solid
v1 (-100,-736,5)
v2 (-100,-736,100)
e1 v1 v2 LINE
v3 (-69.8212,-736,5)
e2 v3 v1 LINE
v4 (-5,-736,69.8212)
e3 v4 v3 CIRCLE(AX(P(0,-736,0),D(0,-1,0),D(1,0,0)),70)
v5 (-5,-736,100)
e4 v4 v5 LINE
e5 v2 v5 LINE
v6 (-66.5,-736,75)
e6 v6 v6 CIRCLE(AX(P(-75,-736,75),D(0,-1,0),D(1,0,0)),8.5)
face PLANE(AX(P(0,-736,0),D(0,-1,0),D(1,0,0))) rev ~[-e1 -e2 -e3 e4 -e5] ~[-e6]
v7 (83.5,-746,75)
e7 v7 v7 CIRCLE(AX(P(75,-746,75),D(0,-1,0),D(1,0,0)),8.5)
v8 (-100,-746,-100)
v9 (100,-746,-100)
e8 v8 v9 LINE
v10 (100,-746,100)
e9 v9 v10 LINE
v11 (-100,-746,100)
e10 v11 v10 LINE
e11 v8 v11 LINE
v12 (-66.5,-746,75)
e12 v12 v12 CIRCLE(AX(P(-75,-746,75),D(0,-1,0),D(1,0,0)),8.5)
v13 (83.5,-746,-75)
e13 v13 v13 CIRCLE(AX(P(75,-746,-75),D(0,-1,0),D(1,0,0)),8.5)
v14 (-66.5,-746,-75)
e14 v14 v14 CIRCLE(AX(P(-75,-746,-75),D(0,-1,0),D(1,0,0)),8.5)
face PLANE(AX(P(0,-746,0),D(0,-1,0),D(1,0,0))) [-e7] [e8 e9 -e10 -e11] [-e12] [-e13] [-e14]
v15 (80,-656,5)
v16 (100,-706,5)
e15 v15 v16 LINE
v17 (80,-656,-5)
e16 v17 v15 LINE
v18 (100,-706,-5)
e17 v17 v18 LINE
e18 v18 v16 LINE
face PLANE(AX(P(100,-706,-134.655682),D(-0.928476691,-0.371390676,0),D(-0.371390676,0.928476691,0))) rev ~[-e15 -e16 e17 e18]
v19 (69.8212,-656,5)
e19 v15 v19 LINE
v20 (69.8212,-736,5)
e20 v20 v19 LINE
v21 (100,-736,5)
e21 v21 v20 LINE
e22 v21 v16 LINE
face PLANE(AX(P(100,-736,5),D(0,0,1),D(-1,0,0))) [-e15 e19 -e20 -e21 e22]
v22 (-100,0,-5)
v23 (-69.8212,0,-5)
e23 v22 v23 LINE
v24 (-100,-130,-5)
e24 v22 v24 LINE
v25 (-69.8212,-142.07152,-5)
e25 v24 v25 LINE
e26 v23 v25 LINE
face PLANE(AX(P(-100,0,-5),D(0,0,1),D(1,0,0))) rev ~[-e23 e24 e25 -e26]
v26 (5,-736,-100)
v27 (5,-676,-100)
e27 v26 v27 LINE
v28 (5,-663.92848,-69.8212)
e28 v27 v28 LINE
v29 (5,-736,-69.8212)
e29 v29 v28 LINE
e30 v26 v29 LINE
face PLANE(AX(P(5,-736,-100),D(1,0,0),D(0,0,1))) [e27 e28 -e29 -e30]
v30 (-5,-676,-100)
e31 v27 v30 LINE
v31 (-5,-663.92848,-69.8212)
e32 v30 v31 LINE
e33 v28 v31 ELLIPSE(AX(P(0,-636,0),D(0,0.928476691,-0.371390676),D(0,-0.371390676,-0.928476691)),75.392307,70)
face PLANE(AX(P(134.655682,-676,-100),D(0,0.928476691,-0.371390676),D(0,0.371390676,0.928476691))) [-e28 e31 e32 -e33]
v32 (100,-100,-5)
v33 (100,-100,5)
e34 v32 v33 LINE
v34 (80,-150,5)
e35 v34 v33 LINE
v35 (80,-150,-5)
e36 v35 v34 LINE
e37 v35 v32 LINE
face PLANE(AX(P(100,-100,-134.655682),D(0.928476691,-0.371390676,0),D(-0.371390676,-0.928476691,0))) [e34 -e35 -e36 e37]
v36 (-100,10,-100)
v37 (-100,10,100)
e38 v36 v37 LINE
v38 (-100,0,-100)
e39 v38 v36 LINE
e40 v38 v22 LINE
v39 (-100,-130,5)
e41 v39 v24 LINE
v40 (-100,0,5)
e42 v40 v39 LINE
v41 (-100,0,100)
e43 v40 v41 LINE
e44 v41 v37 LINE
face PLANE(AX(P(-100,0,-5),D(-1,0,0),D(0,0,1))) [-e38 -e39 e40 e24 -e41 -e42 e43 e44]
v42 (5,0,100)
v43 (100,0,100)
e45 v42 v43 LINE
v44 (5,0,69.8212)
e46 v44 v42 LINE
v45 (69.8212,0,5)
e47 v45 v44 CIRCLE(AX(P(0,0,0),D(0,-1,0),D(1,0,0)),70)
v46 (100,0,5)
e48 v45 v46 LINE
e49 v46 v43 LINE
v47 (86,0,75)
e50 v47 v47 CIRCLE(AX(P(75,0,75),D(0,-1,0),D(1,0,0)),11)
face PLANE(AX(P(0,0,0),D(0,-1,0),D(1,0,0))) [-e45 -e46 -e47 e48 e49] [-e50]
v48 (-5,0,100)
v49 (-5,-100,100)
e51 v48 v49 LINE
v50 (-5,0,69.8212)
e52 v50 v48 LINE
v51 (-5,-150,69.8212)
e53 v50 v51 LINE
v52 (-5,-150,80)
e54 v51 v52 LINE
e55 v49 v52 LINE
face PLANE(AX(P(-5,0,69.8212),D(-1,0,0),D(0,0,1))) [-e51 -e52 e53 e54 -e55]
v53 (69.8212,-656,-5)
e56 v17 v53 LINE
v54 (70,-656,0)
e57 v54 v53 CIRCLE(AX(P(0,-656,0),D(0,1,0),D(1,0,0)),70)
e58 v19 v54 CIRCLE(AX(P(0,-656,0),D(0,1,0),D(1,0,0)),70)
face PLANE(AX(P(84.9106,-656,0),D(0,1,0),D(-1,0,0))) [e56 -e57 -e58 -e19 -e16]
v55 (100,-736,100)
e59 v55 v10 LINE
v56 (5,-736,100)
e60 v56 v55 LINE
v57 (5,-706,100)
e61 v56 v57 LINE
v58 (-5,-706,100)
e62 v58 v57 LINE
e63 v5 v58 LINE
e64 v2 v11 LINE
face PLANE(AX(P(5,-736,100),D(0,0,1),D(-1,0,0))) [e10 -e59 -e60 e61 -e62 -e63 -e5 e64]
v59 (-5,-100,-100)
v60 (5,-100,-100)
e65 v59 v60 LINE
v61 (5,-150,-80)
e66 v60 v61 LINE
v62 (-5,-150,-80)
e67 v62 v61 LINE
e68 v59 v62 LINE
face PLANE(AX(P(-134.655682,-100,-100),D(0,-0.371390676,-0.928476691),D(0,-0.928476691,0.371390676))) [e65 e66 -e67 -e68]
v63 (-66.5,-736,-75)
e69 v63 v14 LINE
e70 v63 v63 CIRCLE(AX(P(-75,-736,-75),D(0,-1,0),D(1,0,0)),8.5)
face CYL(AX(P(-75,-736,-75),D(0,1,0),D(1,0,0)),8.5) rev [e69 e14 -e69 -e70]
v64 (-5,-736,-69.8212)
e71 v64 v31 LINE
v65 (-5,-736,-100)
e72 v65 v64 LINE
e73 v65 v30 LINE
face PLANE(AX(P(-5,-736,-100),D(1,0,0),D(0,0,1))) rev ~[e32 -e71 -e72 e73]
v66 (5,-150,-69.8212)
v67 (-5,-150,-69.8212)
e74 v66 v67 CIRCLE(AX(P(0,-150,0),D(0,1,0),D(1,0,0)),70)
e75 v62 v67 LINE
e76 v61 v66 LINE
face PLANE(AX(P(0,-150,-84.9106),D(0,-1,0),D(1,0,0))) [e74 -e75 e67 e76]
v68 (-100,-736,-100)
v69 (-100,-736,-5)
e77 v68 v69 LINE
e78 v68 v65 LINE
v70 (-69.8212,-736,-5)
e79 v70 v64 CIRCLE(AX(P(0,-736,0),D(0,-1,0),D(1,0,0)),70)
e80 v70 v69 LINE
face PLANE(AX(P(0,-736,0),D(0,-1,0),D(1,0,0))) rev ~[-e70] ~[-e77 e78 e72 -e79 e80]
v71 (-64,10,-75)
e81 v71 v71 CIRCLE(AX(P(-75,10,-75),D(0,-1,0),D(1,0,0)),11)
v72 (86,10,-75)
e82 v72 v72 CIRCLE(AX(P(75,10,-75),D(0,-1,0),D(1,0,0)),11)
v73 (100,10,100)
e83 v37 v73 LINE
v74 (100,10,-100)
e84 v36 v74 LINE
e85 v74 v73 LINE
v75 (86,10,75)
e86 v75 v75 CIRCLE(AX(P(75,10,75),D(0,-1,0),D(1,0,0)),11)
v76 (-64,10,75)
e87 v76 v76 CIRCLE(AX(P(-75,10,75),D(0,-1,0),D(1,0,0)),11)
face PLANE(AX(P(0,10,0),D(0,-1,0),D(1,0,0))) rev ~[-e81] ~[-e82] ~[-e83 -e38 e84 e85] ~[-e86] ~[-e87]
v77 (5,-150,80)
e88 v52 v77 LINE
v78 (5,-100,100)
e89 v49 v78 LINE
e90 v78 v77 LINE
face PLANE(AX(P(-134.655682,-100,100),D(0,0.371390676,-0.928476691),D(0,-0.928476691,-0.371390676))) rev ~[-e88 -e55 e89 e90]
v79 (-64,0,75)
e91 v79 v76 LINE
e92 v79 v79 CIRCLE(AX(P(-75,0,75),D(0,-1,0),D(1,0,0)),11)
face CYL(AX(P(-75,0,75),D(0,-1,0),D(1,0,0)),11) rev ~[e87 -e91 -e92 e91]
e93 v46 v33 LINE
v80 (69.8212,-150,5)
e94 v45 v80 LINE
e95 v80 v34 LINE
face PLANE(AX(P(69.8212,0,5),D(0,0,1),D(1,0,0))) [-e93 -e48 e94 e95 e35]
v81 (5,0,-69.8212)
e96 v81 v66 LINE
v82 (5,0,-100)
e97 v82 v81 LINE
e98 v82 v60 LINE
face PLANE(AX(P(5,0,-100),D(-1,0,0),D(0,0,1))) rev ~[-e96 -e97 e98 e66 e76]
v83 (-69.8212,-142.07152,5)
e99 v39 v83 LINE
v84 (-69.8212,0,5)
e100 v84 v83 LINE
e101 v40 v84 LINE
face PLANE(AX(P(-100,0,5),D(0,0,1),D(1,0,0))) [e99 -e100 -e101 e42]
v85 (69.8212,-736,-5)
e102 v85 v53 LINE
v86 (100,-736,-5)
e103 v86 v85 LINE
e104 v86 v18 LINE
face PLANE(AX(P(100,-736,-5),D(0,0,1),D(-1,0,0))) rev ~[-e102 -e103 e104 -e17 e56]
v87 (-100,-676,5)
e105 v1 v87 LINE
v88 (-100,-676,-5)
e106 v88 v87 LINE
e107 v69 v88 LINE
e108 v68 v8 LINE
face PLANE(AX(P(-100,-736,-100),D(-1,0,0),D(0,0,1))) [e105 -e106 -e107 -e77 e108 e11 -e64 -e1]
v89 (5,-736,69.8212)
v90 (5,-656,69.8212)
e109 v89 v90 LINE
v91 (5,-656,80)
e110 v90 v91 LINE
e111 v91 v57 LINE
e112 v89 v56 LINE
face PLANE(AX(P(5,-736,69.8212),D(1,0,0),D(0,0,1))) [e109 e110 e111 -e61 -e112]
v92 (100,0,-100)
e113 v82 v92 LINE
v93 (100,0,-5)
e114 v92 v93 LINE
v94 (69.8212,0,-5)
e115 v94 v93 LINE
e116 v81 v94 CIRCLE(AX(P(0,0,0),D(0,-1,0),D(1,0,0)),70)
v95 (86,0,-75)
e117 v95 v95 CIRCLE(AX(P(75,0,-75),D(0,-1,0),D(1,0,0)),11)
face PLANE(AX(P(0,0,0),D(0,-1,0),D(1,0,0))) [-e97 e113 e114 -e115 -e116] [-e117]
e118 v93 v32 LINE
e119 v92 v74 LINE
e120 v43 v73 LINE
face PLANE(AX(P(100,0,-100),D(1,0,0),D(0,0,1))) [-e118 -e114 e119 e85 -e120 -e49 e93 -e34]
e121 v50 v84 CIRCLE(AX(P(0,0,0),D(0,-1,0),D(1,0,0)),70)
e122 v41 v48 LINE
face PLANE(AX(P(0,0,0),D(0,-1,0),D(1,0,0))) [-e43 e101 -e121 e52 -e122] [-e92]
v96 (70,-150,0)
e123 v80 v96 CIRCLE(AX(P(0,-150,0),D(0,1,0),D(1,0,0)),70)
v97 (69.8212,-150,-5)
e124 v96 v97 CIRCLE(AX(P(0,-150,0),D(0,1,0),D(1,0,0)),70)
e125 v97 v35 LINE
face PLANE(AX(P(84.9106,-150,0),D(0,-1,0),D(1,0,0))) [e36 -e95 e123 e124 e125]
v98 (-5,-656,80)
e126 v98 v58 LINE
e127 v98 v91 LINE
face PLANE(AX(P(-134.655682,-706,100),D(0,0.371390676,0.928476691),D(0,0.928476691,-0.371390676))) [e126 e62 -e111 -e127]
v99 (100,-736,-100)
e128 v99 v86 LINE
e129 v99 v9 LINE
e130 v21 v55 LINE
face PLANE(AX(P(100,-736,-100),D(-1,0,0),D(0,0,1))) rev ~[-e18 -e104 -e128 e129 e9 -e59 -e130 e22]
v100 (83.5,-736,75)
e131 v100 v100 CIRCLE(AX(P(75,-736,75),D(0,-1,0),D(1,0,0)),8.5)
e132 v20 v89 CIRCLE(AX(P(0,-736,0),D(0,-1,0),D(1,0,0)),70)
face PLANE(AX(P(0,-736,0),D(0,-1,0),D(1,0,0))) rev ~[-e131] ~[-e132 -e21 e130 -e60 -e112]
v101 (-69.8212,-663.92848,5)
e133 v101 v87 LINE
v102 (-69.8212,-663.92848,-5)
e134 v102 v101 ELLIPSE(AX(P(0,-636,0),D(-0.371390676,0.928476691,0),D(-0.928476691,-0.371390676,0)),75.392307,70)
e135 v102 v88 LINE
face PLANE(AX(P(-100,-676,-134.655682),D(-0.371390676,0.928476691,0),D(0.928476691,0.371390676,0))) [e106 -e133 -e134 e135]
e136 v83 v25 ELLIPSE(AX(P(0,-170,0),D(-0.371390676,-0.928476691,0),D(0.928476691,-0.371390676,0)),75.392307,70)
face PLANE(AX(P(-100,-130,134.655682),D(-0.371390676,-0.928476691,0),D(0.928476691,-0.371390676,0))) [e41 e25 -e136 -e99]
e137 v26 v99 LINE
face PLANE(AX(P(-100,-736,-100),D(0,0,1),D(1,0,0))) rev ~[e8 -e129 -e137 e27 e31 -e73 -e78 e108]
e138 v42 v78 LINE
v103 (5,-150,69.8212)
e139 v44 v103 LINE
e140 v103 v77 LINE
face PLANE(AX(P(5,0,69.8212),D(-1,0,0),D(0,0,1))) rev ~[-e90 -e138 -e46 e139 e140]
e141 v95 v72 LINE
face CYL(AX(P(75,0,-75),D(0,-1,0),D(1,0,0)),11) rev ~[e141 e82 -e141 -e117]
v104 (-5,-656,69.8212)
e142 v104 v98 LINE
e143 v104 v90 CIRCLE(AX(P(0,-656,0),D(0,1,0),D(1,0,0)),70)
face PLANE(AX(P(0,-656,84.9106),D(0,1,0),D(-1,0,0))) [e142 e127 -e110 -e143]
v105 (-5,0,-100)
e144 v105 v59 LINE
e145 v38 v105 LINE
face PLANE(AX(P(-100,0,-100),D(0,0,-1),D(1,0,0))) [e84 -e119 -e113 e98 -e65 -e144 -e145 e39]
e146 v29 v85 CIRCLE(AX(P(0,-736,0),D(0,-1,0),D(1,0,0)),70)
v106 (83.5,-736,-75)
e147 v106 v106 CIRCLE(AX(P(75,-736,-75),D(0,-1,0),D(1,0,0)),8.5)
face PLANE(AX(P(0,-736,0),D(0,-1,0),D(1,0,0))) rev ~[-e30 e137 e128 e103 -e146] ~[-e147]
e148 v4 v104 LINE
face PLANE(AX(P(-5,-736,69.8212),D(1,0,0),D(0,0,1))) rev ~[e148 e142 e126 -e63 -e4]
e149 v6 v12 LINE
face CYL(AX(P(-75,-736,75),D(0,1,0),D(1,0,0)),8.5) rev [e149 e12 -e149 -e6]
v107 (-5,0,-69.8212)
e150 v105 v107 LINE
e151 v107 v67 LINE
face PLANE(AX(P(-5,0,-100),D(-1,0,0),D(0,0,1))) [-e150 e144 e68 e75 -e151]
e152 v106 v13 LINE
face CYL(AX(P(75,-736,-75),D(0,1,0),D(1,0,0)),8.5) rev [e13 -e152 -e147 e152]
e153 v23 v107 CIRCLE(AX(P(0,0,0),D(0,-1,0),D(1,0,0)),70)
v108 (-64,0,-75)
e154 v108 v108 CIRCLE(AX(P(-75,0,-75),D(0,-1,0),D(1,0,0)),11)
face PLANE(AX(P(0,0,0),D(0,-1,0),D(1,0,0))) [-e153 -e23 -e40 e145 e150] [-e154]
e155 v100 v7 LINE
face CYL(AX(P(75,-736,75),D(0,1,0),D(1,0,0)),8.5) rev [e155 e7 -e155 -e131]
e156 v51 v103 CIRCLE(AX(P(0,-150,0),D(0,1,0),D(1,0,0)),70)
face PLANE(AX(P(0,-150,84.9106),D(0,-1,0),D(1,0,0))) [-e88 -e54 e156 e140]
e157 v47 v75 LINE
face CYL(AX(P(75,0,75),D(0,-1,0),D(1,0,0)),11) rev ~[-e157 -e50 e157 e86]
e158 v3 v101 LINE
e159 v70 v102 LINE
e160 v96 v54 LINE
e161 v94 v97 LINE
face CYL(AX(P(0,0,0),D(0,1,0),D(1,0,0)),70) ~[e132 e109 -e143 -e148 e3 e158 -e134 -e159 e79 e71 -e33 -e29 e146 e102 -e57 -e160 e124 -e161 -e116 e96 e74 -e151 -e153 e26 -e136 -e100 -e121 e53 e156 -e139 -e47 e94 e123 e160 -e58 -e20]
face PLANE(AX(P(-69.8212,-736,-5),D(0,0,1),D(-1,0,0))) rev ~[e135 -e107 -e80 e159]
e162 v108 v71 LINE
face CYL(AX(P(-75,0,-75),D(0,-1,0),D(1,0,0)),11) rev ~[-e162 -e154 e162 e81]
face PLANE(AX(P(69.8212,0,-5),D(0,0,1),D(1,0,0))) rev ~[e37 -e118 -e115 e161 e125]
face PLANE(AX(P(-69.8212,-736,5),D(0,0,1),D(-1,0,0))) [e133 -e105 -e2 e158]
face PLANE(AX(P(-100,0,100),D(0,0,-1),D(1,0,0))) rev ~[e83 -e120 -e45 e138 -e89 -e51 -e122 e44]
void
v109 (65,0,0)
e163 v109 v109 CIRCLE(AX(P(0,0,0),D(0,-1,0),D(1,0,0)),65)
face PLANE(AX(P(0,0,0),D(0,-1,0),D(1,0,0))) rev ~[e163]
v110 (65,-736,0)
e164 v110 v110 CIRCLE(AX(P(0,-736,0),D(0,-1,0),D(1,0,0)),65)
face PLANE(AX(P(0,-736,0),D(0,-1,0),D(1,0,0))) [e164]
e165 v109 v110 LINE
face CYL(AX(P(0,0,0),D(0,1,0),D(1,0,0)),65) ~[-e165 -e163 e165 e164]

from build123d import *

# Parameters (mm, degrees)
F0_R          = 70
F0_R_2        = 65
F1_DEPTH      = 736
F2_W          = 200
F2_H          = 200
F2_R          = 11
F3_DEPTH      = 10
F4_W          = 30.1787997812
F4_H          = 10
F4_W_2        = 10
F4_H_2        = 30.1787997812
F5_DEPTH      = 150
F6_T1_DEPTH   = 269.311363913
F6_T3_DEPTH   = 269.311363913
F6_T8_DEPTH   = 269.311363913
F6_S9_R       = 70
F6_T10_DEPTH  = 139
F8_W          = 200
F8_H          = 200
F8_R          = 8.5
F9_DEPTH      = 10
F10_W         = 10
F10_H         = 30.1787997812
F10_W_2       = 30.1787997812
F10_H_2       = 10
F11_DEPTH     = 80
F12_T1_DEPTH  = 269.311363913
F12_T3_DEPTH  = 269.311363913
F12_T8_DEPTH  = 269.311363913
F12_S9_R      = 70
F12_T10_DEPTH = 139
F12_T14_DEPTH = 269.311363913
F12_S15_R     = 70
F12_T16_DEPTH = 139


# Not quite as in the source:
# - a fillet or chamfer that OpenCascade refuses, or shapes differently, is made with other operations: its cross-section is extruded or revolved along the edge and cut away or added


with BuildPart() as f1:
    # F0 (on Front) → F1 (new body)
    with BuildSketch(Plane.XZ):
        Circle(F0_R)
        Circle(F0_R_2, mode=Mode.SUBTRACT)
    extrude(amount=F1_DEPTH)

    # F2 (on Front) → F3 (join)
    with BuildSketch(Plane.XZ):
        Rectangle(F2_W, F2_H)
        with Locations((-75, -75)):
            Circle(F2_R, mode=Mode.SUBTRACT)
        with Locations((75, -75)):
            Circle(F2_R, mode=Mode.SUBTRACT)
        with Locations((-75, 75)):
            Circle(F2_R, mode=Mode.SUBTRACT)
        with Locations((75, 75)):
            Circle(F2_R, mode=Mode.SUBTRACT)
    extrude(amount=-F3_DEPTH)

    # F4 (on Front) → F5 (join)
    with BuildSketch(Plane.XZ):
        with Locations((-84.9106001094, 0)):
            Rectangle(F4_W, F4_H)
        with Locations((0, 84.9106001094)):
            Rectangle(F4_W_2, F4_H_2)
        with Locations((84.9106001094, 0)):
            Rectangle(F4_W, F4_H)
        with Locations((0, -84.9106001094)):
            Rectangle(F4_W_2, F4_H_2)
    extrude(amount=F5_DEPTH)

    # F6: chamfer of 50 x 20 on 4 edges, made by hand

    # F6_s2 → F6_t1 (cut)
    with BuildSketch(Plane.YZ.offset(-134.6556819565)):
        Polygon((-100, 100), (-150, 80), (-150, 100), align=None)
        Polygon((-100, -100), (-150, -80), (-150, -100), align=None)
    extrude(amount=F6_T1_DEPTH, mode=Mode.SUBTRACT)

    # F6_s4 → F6_t3 (cut)
    with BuildSketch(Plane.XY.offset(-134.6556819565)):
        Polygon((100, -100), (80, -150), (100, -150), align=None)
    extrude(amount=F6_T3_DEPTH, mode=Mode.SUBTRACT)


with BuildPart() as f6_tool6:
    # F6_s7 → F6_t8 (new body)
    with BuildSketch(Plane.XY.offset(134.6556819565)):
        Polygon((-100, -130), (-50, -150), (-100, -150), align=None)
    extrude(amount=-F6_T8_DEPTH)

    # F6_s9 → F6_t10 (cut, symmetric)
    with BuildSketch(Plane.XZ.offset(140)):
        Circle(F6_S9_R)
    extrude(amount=F6_T10_DEPTH, both=True, mode=Mode.SUBTRACT)


with BuildPart() as f1_1:
    add(f1.part)

    # F6_t5: cut F6_tool6
    add(f6_tool6.part, mode=Mode.SUBTRACT)

    # F8 (on offset) → F9 (join)
    with BuildSketch(Plane.XZ.offset(736)):
        Rectangle(F8_W, F8_H)
        with Locations((-75, -75)):
            Circle(F8_R, mode=Mode.SUBTRACT)
        with Locations((75, -75)):
            Circle(F8_R, mode=Mode.SUBTRACT)
        with Locations((-75, 75)):
            Circle(F8_R, mode=Mode.SUBTRACT)
        with Locations((75, 75)):
            Circle(F8_R, mode=Mode.SUBTRACT)
    extrude(amount=F9_DEPTH)

    # F10 (on face) → F11 (join)
    with BuildSketch(Plane(origin=(0, -736, 0), x_dir=(-1, 0, 0), z_dir=(0, 1, 0))):
        with Locations((0, 84.9106001094)):
            Rectangle(F10_W, F10_H)
        with Locations((84.9106001094, 0)):
            Rectangle(F10_W_2, F10_H_2)
        with Locations((0, -84.9106001094)):
            Rectangle(F10_W, F10_H)
        with Locations((-84.9106001094, 0)):
            Rectangle(F10_W_2, F10_H_2)
    extrude(amount=F11_DEPTH)

    # F12: chamfer of 20 x 50 on 4 edges, made by hand

    # F12_s2 → F12_t1 (cut)
    with BuildSketch(Plane.YZ.offset(-134.6556819565)):
        Polygon((-706, 100), (-656, 80), (-656, 100), align=None)
    extrude(amount=F12_T1_DEPTH, mode=Mode.SUBTRACT)

    # F12_s4 → F12_t3 (cut)
    with BuildSketch(Plane.XY.offset(-134.6556819565)):
        Polygon((100, -706), (80, -656), (100, -656), align=None)
    extrude(amount=F12_T3_DEPTH, mode=Mode.SUBTRACT)


with BuildPart() as f12_tool6:
    # F12_s7 → F12_t8 (new body)
    with BuildSketch(Plane.XY.offset(-134.6556819565)):
        Polygon((-100, -676), (-50, -656), (-100, -656), align=None)
    extrude(amount=F12_T8_DEPTH)

    # F12_s9 → F12_t10 (cut, symmetric)
    with BuildSketch(Plane.XZ.offset(666)):
        Circle(F12_S9_R)
    extrude(amount=F12_T10_DEPTH, both=True, mode=Mode.SUBTRACT)


with BuildPart() as f1_2:
    add(f1_1.part)

    # F12_t5: cut F12_tool6
    add(f12_tool6.part, mode=Mode.SUBTRACT)


with BuildPart() as f12_tool12:
    # F12_s13 → F12_t14 (new body)
    with BuildSketch(Plane.YZ.offset(134.6556819565)):
        Polygon((-676, -100), (-656, -50), (-656, -100), align=None)
    extrude(amount=-F12_T14_DEPTH)

    # F12_s15 → F12_t16 (cut, symmetric)
    with BuildSketch(Plane.XZ.offset(666)):
        Circle(F12_S15_R)
    extrude(amount=F12_T16_DEPTH, both=True, mode=Mode.SUBTRACT)


with BuildPart() as f1_3:
    add(f1_2.part)

    # F12_t11: cut F12_tool12
    add(f12_tool12.part, mode=Mode.SUBTRACT)


solid = f1_3.part
